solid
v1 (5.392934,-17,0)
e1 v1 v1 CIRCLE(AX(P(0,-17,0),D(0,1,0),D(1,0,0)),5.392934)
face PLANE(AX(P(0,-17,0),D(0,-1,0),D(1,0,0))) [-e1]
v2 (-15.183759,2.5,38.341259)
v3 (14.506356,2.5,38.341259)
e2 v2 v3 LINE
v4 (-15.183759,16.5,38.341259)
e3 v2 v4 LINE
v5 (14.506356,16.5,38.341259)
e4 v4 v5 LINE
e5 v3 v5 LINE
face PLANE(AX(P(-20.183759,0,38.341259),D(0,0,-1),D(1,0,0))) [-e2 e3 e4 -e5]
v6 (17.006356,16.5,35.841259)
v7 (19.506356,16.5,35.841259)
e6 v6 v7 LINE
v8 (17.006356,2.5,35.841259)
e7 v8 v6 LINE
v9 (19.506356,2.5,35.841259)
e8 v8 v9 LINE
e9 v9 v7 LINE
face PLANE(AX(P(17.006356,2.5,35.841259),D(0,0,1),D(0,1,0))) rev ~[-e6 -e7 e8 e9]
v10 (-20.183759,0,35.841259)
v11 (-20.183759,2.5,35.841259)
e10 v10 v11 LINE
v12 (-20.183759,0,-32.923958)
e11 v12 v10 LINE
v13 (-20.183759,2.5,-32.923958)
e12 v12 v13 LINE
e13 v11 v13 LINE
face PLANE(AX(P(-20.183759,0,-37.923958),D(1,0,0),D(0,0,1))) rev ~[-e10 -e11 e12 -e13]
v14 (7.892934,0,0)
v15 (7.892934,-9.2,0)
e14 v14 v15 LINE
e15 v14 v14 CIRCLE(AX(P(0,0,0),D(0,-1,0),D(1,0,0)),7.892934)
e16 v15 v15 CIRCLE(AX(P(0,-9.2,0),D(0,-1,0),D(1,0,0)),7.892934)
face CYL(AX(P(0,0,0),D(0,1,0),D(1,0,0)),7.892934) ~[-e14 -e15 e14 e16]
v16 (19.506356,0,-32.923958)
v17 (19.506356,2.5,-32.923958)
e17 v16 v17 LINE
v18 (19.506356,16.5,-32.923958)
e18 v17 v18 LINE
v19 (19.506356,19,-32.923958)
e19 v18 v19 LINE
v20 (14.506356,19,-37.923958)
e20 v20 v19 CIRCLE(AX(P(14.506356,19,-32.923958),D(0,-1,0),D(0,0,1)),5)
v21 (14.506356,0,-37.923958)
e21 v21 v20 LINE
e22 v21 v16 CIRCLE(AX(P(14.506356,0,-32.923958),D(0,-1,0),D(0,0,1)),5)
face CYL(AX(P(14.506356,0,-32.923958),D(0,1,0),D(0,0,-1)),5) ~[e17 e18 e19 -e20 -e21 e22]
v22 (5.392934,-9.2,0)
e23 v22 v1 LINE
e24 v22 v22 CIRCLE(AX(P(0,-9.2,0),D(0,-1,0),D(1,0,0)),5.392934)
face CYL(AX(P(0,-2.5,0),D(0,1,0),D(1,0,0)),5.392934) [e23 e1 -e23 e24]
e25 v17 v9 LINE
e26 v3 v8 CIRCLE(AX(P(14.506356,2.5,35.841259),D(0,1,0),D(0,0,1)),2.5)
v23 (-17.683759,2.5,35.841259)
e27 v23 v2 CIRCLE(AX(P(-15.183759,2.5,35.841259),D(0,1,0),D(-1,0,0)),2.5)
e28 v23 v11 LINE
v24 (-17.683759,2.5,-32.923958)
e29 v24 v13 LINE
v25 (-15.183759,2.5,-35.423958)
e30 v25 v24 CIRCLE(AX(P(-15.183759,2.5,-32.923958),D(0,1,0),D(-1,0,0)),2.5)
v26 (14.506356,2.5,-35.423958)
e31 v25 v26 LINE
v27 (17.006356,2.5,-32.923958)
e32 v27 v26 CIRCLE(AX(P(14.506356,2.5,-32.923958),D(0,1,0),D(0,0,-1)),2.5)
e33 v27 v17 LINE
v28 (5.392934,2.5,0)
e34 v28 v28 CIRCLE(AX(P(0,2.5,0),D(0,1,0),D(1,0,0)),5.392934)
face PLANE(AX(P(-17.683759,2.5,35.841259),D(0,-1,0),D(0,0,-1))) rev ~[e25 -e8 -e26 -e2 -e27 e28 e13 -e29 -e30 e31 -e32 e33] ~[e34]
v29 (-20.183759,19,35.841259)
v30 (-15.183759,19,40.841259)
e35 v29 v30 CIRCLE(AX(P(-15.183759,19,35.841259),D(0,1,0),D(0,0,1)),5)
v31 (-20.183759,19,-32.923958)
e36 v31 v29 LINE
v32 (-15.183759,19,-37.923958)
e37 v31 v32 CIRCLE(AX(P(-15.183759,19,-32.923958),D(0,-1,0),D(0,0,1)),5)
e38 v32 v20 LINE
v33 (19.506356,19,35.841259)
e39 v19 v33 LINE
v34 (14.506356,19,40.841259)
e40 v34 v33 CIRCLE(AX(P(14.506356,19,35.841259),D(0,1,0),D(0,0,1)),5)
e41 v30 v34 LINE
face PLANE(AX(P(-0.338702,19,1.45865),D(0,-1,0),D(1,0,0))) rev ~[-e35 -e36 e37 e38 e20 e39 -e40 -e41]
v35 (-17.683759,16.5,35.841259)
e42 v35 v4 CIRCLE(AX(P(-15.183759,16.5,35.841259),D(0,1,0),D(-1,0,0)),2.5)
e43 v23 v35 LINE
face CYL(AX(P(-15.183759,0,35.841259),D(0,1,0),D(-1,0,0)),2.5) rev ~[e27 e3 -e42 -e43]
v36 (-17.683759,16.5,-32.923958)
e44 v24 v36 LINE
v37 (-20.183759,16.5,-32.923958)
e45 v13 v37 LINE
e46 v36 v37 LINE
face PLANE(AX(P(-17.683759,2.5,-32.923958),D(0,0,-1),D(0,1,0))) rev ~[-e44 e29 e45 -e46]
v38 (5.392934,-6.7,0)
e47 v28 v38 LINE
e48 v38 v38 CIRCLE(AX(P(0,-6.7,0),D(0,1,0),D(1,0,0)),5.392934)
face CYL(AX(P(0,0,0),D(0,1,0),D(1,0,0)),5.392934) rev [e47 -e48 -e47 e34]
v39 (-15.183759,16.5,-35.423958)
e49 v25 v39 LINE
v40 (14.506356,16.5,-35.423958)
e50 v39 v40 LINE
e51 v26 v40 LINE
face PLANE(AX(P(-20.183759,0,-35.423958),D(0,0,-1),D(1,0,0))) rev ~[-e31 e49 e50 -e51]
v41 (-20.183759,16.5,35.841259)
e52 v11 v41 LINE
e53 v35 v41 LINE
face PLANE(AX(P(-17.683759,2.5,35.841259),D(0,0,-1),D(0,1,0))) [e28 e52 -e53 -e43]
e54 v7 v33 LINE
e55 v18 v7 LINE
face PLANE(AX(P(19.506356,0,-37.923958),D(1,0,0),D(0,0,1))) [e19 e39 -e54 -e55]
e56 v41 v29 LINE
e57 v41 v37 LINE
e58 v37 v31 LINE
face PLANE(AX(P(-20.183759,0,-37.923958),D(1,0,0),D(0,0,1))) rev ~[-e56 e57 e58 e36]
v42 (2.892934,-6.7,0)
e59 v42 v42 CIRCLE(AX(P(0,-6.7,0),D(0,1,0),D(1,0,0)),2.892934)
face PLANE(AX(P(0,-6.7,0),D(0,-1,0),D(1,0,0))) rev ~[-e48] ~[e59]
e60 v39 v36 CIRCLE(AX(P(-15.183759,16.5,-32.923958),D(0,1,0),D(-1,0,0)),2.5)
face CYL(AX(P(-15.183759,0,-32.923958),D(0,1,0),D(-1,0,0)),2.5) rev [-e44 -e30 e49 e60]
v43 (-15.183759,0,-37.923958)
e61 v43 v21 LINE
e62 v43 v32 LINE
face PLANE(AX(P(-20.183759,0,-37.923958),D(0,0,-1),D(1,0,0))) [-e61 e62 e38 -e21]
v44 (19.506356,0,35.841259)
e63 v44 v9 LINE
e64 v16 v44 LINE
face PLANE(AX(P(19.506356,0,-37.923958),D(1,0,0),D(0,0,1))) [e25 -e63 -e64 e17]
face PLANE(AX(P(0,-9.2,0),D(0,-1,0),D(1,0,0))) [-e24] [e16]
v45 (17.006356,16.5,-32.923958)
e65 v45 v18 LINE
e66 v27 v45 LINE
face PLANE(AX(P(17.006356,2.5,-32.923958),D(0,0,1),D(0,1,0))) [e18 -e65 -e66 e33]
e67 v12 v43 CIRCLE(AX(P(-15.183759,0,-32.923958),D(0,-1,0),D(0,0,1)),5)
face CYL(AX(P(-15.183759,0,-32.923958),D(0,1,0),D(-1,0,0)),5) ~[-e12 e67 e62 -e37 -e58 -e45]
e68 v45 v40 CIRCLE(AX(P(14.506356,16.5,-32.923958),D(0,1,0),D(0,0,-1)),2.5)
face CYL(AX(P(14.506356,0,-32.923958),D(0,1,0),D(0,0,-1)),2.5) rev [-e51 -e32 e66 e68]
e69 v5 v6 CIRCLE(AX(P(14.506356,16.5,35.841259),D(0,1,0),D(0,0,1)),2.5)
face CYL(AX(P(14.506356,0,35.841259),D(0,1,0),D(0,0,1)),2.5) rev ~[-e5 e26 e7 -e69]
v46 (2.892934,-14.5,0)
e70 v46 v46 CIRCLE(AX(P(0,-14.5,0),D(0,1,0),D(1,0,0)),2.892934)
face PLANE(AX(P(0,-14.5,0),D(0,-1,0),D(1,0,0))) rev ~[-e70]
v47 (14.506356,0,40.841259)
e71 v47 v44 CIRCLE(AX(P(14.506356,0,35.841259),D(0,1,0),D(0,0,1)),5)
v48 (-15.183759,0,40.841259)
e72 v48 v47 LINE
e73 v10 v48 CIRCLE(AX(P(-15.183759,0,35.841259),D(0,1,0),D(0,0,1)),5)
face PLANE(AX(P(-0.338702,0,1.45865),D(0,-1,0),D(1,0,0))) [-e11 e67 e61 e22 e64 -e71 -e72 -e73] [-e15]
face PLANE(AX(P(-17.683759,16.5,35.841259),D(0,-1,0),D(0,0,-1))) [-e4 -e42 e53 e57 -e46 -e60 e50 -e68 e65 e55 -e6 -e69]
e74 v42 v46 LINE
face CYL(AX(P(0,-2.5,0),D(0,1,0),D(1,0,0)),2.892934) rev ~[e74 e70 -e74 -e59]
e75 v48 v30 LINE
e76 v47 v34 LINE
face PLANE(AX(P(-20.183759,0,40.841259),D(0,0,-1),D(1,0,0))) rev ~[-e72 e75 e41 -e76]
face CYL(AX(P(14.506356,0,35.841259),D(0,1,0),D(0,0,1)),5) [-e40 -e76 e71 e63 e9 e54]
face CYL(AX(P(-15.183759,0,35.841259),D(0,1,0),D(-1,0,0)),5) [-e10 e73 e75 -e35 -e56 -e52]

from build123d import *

# Parameters (mm, degrees)
F0_R     = 7.8929339783
F1_DEPTH = 9.2
F2_T     = -2.5
F3_DEPTH = 14.5
F4_W     = 39.6901145577
F4_H     = 78.7652172148
F5_DEPTH = 19
F6_R     = 5
F7_T     = -2.5


# Not quite as in the source:
# - a shell that OpenCascade refuses in one call is made with other operations: the cavity is built on its own and cut out


with BuildPart() as f1:
    # F0 (on Front) → F1 (new body)
    with BuildSketch(Plane.XZ):
        Circle(F0_R)
    extrude(amount=F1_DEPTH)

    # F2
    f2_openings = [f1.faces().sort_by_distance(p)[0] for p in [
        (0, -9.2, 0),
    ]]
    offset(amount=F2_T, openings=f2_openings)

    # F3 (add): a face of the model
    f3_faces = [f1.faces().sort_by_distance(p)[0] for p in [
        (0, -2.5, 0),
    ]]
    extrude(f3_faces, amount=F3_DEPTH)

    # F4 (on Front) → F5 (join)
    with BuildSketch(Plane.XZ):
        with Locations((-0.3387015313, 1.4586504549)):
            Rectangle(F4_W, F4_H)
    extrude(amount=-F5_DEPTH)

    # F6
    f6_edges = [f1.edges().sort_by_distance(p)[0] for p in [
        (19.506356, 9.5, 40.841259),
        (19.506356, 9.5, -37.923958),
        (-20.183759, 9.5, 40.841259),
        (-20.183759, 9.5, -37.923958),
    ]]
    fillet(f6_edges, radius=F6_R)

    # F7: a shell. OpenCascade refuses it in one call, so the cavity is built on its own and cut out:
    # the body offset inwards by the wall thickness, plus a prism from it out through each open face.
    f7_core = offset(f1.part, amount=F7_T, kind=Kind.INTERSECTION, mode=Mode.PRIVATE)
    f7_exits = [f7_core.faces().sort_by_distance(p)[0] for p in [
        (17.006356, 9.5, 1.45865),
        (-17.683759, 9.5, 1.45865),
    ]]
    add(f7_core, mode=Mode.SUBTRACT)
    extrude(f7_exits, amount=-F7_T, mode=Mode.SUBTRACT)


solid = f1.part
